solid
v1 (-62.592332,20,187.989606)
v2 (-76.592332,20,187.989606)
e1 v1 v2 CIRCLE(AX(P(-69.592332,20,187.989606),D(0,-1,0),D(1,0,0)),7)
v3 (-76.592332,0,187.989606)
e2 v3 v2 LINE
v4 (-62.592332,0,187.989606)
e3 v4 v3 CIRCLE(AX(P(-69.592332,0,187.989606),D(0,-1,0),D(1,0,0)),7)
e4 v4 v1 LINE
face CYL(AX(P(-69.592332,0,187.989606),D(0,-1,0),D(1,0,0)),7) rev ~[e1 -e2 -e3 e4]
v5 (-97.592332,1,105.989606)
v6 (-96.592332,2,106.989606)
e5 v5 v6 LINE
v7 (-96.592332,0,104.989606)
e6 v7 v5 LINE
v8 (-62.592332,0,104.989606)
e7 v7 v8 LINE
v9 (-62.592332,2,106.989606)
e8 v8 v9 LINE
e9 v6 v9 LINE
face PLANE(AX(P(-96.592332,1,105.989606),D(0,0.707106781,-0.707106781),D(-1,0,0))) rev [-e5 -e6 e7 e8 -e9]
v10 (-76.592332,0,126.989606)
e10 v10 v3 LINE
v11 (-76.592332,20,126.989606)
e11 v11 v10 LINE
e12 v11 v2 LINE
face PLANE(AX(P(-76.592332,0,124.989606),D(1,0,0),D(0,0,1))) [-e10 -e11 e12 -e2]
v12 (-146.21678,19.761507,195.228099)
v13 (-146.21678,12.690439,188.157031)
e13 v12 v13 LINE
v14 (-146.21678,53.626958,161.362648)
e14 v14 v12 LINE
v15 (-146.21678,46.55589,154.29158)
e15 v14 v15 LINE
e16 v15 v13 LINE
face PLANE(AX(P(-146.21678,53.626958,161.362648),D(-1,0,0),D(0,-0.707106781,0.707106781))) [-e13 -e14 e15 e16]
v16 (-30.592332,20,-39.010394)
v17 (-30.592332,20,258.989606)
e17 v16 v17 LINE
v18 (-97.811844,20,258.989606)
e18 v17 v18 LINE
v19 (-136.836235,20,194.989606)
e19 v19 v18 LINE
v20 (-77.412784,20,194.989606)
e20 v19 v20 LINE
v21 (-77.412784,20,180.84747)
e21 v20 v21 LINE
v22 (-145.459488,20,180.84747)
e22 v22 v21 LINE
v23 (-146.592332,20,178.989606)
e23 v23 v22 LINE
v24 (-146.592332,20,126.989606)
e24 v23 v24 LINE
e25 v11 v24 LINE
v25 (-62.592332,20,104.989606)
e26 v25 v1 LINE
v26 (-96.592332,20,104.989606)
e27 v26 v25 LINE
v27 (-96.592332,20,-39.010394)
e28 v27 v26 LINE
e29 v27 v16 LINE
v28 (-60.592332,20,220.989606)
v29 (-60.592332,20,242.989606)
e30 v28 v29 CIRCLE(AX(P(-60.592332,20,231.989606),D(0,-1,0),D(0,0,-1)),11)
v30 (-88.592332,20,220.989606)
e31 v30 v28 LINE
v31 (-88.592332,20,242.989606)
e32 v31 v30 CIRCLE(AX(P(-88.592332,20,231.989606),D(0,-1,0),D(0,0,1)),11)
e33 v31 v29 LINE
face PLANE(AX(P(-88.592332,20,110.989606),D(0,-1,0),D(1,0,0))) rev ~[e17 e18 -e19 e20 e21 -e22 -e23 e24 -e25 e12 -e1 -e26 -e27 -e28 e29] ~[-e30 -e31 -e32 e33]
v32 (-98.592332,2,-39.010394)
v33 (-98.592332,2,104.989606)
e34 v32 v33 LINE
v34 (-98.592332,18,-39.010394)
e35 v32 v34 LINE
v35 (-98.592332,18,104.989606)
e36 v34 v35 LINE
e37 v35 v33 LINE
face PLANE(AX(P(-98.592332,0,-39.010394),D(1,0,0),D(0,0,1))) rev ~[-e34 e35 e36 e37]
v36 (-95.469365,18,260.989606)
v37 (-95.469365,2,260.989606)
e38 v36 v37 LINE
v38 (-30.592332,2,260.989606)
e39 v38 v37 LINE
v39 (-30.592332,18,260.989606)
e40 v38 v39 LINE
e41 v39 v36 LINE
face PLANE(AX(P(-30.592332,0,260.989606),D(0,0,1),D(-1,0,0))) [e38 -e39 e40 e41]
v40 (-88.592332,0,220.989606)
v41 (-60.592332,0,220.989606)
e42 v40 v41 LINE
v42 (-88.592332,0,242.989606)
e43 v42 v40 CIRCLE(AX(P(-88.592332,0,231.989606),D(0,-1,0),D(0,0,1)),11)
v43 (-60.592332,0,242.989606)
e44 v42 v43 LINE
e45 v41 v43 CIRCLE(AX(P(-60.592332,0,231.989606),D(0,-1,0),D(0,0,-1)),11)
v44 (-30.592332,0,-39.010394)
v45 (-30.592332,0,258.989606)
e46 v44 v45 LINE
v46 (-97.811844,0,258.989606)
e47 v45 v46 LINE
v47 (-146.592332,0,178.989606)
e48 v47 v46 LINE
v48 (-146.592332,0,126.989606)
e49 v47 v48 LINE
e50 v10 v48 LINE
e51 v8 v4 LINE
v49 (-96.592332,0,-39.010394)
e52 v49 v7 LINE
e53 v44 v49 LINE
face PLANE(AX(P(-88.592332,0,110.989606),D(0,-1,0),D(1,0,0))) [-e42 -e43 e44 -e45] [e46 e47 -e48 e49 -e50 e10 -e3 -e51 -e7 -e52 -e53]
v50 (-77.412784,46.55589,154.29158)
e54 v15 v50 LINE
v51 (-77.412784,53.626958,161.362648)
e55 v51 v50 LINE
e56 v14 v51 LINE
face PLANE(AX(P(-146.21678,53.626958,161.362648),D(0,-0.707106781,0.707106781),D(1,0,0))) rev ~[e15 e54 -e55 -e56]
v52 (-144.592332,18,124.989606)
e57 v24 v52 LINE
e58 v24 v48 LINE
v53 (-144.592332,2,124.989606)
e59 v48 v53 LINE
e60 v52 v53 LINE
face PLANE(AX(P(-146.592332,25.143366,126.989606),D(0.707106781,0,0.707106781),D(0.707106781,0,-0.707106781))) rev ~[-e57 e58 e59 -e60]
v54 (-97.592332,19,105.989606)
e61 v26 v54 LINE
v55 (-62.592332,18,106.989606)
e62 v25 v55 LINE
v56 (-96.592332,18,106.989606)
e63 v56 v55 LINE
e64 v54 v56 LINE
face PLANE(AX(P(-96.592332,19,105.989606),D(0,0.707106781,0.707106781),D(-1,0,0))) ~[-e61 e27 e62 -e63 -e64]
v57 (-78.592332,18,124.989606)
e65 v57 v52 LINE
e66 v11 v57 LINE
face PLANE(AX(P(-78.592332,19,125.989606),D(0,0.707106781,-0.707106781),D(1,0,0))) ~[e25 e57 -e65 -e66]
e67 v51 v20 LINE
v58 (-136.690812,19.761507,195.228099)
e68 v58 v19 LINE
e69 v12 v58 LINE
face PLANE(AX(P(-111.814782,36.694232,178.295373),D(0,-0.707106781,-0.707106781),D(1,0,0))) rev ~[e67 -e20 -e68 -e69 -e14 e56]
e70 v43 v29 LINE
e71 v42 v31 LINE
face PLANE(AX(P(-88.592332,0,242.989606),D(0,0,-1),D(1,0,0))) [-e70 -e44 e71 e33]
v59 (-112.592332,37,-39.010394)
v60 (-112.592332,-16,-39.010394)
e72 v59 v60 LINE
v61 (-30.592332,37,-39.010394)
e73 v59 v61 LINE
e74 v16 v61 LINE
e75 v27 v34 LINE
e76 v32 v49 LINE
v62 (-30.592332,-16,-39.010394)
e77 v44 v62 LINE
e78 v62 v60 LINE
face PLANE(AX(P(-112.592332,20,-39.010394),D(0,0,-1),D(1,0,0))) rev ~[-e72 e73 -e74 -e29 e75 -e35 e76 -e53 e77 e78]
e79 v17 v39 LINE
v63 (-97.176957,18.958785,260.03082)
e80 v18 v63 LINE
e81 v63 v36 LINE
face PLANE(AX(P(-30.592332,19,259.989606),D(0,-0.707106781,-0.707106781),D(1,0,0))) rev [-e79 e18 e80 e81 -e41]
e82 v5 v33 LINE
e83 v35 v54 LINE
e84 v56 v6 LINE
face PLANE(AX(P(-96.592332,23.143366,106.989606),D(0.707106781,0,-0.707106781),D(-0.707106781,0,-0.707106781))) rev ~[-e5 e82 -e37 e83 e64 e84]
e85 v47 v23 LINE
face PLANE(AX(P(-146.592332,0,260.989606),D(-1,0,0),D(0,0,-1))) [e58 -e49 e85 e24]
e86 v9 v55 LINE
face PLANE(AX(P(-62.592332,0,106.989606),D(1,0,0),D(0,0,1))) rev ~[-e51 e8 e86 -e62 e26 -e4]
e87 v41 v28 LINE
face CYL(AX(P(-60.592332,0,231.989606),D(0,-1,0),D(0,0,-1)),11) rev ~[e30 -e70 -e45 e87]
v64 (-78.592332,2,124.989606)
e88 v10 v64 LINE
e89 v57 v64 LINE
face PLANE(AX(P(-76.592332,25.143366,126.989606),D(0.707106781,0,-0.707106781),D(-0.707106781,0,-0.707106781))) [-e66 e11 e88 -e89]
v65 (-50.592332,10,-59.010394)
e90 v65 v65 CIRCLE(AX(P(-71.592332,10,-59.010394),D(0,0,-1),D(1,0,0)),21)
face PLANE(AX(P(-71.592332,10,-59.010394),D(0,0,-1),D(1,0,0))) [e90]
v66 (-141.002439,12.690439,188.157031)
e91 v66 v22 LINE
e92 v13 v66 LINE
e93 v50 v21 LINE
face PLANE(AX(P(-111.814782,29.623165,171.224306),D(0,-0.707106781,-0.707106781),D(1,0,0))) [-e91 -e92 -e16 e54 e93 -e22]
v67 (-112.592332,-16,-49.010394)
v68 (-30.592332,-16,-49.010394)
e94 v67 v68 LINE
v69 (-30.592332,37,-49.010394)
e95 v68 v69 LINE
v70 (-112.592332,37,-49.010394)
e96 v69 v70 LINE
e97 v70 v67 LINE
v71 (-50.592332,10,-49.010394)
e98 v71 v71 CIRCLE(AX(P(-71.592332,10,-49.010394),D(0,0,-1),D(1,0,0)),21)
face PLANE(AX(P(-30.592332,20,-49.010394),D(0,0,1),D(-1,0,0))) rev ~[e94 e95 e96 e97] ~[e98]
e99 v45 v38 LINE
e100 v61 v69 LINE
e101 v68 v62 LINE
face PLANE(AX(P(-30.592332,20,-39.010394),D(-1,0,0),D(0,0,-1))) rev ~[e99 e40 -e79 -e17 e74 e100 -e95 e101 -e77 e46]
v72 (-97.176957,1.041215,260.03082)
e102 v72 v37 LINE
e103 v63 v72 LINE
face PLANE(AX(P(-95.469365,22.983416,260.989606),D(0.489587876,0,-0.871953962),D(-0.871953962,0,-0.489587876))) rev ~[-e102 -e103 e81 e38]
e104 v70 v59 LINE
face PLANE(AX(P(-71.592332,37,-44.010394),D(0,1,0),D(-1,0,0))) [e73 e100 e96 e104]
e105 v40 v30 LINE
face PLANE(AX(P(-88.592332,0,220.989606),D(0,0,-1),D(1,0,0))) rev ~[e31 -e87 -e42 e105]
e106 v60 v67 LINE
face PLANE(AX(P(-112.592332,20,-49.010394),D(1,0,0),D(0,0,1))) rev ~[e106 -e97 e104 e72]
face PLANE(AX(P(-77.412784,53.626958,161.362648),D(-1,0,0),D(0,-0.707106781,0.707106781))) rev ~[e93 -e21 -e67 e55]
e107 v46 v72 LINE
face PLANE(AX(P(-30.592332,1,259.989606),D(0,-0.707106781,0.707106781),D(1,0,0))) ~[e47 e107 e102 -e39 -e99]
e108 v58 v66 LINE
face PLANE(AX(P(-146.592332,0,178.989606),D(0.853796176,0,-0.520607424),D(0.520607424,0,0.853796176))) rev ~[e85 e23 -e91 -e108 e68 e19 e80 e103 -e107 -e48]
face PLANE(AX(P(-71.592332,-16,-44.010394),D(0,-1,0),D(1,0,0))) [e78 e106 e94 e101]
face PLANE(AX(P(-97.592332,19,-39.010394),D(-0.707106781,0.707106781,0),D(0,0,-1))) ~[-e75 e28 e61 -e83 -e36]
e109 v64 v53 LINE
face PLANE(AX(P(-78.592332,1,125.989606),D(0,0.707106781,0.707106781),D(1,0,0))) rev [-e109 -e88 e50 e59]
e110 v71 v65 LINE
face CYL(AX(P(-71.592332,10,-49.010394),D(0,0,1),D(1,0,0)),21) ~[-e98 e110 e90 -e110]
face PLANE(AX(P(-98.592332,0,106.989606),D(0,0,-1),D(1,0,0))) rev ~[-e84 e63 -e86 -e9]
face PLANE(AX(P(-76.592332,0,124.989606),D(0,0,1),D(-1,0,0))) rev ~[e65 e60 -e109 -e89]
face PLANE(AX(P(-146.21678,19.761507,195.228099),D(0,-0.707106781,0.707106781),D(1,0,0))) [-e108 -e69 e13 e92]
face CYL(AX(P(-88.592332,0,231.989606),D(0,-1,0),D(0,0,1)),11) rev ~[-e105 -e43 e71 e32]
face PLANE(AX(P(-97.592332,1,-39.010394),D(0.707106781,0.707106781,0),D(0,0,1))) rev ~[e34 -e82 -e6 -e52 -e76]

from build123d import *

# Parameters (mm, degrees)
F1_DEPTH     = 20
F2_W         = 14
F2_H         = 63
F3_DEPTH     = 25
F4_W         = 28
F4_H         = 22
F5_DEPTH     = 25
F7_DEPTH     = 16
F10_DEPTH    = 17
F9_R         = 21
F11_DEPTH    = 10
F13_SIZE     = 2
F14_T1_DEPTH = 30.2867319519
F14_T3_DEPTH = 26.2867319519
F14_T5_DEPTH = 25.9668324626
F15_SIZE     = 2
F18_W        = 68.8039958477
F18_H        = 47.8929802775
F19_DEPTH    = 10


# Not quite as in the source:
# - a fillet or chamfer that OpenCascade refuses, or shapes differently, is made with other operations: its cross-section is extruded or revolved along the edge and cut away or added


with BuildPart() as f1:
    # F0 (on Front) → F1 (new body)
    with BuildSketch(Plane.XZ):
        Polygon((-30.5923320651, 260.9896056354), (-146.5923320651, 260.9896056354), (-146.5923320651, -39.0103943646), (-112.5923320651, -39.0103943646), (-30.5923320651, -39.0103943646), align=None)
        Polygon((-30.5923320651, -49.0103943646), (-30.5923320651, -39.0103943646), (-112.5923320651, -39.0103943646), (-112.5923320651, -49.0103943646), (-92.5923320651, -49.0103943646), (-50.5923320651, -49.0103943646), align=None)
    extrude(amount=-F1_DEPTH)

    # F2 (on face) → F3 (cut)
    with BuildSketch(Plane.XZ):
        Polygon((-158.5923320651, 124.9896056354), (-158.5923320651, -39.0103943646), (-98.5923320651, -39.0103943646), (-98.5923320651, 106.9896056354), (-98.5923320651, 124.9896056354), align=None)
        Polygon((-98.5923320651, 124.9896056354), (-98.5923320651, 106.9896056354), (-62.5923320651, 106.9896056354), (-62.5923320651, 124.9896056354), (-76.5923320651, 124.9896056354), align=None)
        with Locations((-69.5923320651, 156.4896056354)):
            Rectangle(F2_W, F2_H)
        with BuildLine():
            ThreePointArc((-62.5923320651, 187.9896056354), (-69.5923320651, 194.9896056354), (-76.5923320651, 187.9896056354))
            Line((-76.5923320651, 187.9896056354), (-62.5923320651, 187.9896056354))
        make_face()
        Polygon((-146.5923320651, 260.9896056354), (-146.5923320651, 178.9896056354), (-96.5923320651, 260.9896056354), align=None)
    extrude(amount=-F3_DEPTH, mode=Mode.SUBTRACT)

    # F4 (on face) → F5 (cut)
    with BuildSketch(Plane.XZ):
        with Locations((-74.5923320651, 231.9896056354)):
            Rectangle(F4_W, F4_H)
        with BuildLine():
            ThreePointArc((-60.5923320651, 220.9896056354), (-49.5923320651, 231.9896056354), (-60.5923320651, 242.9896056354))
            Line((-60.5923320651, 242.9896056354), (-60.5923320651, 220.9896056354))
        make_face()
        with BuildLine():
            Line((-88.5923320651, 220.9896056354), (-88.5923320651, 242.9896056354))
            ThreePointArc((-88.5923320651, 242.9896056354), (-99.5923320651, 231.9896056354), (-88.5923320651, 220.9896056354))
        make_face()
    extrude(amount=-F5_DEPTH, mode=Mode.SUBTRACT)

    # F6 (on face) → F7 (join)
    with BuildSketch(Plane.XZ):
        Polygon((-30.5923320651, -39.0103943646), (-98.5923320651, -39.0103943646), (-112.5923320651, -39.0103943646), (-112.5923320651, -49.0103943646), (-30.5923320651, -49.0103943646), align=None)
    extrude(amount=F7_DEPTH)

    # F8 (on face) → F10 (join)
    with BuildSketch(Plane(origin=(0, 20, 0), x_dir=(-1, 0, 0), z_dir=(0, 1, 0))):
        Polygon((112.5923320651, -39.0103943646), (98.5923320651, -39.0103943646), (30.5923320651, -39.0103943646), (30.5923320651, -49.0103943646), (112.5923320651, -49.0103943646), align=None)
    extrude(amount=F10_DEPTH)

    # F9 (on face) → F11 (join)
    with BuildSketch(Plane(origin=(0, 0, -49.0103943646), x_dir=(1, 0, 0), z_dir=(0, 0, -1))):
        with Locations((-71.5923320651, -10)):
            Circle(F9_R)
    extrude(amount=F11_DEPTH)

    # F13
    f13_edges = [f1.edges().sort_by_distance(p)[0] for p in [
        (-98.592332, 0, 33.989606),
        (-98.592332, 20, 33.989606),
    ]]
    chamfer(f13_edges, length=F13_SIZE)

    # F14: chamfer of 2 on 4 edges, made by hand

    # F14_s2 → F14_t1 (cut)
    with BuildSketch(Plane.XZ.offset(-25.1433659759)):
        Polygon((-146.5923320651, 126.9896056354), (-144.5923320651, 124.9896056354), (-146.5923320651, 124.9896056354), align=None)
        Polygon((-76.5923320651, 126.9896056354), (-78.5923320651, 124.9896056354), (-76.5923320651, 124.9896056354), align=None)
    extrude(amount=F14_T1_DEPTH, mode=Mode.SUBTRACT)

    # F14_s4 → F14_t3 (cut)
    with BuildSketch(Plane.XZ.offset(-23.1433659759)):
        Polygon((-96.5923320651, 106.9896056354), (-98.5923320651, 104.9896056354), (-98.5923320651, 106.9896056354), align=None)
    extrude(amount=F14_T3_DEPTH, mode=Mode.SUBTRACT)

    # F14_s6 → F14_t5 (cut)
    with BuildSketch(Plane.XZ.offset(-22.9834162313)):
        Polygon((-95.4693648059, 260.9896056354), (-97.1769571575, 260.0308204839), (-96.5923320651, 260.9896056354), align=None)
    extrude(amount=F14_T5_DEPTH, mode=Mode.SUBTRACT)

    # F15
    f15_edges = [f1.edges().sort_by_distance(p)[0] for p in [
        (-111.592332, 0, 124.989606),
        (-111.592332, 20, 124.989606),
        (-79.592332, 0, 106.989606),
        (-79.592332, 20, 106.989606),
        (-63.030848, 0, 260.989606),
        (-63.030848, 20, 260.989606),
    ]]
    chamfer(f15_edges, length=F15_SIZE)

    # F18 (on face) → F19 (join)
    with BuildSketch(Plane(origin=(0, 107.4948028177, 107.4948028177), x_dir=(1, 0, 0), z_dir=(0, -0.7071067812, -0.7071067812))):
        with Locations((-111.8147820234, 100.1271270216)):
            Rectangle(F18_W, F18_H)
    extrude(amount=F19_DEPTH)


solid = f1.part
